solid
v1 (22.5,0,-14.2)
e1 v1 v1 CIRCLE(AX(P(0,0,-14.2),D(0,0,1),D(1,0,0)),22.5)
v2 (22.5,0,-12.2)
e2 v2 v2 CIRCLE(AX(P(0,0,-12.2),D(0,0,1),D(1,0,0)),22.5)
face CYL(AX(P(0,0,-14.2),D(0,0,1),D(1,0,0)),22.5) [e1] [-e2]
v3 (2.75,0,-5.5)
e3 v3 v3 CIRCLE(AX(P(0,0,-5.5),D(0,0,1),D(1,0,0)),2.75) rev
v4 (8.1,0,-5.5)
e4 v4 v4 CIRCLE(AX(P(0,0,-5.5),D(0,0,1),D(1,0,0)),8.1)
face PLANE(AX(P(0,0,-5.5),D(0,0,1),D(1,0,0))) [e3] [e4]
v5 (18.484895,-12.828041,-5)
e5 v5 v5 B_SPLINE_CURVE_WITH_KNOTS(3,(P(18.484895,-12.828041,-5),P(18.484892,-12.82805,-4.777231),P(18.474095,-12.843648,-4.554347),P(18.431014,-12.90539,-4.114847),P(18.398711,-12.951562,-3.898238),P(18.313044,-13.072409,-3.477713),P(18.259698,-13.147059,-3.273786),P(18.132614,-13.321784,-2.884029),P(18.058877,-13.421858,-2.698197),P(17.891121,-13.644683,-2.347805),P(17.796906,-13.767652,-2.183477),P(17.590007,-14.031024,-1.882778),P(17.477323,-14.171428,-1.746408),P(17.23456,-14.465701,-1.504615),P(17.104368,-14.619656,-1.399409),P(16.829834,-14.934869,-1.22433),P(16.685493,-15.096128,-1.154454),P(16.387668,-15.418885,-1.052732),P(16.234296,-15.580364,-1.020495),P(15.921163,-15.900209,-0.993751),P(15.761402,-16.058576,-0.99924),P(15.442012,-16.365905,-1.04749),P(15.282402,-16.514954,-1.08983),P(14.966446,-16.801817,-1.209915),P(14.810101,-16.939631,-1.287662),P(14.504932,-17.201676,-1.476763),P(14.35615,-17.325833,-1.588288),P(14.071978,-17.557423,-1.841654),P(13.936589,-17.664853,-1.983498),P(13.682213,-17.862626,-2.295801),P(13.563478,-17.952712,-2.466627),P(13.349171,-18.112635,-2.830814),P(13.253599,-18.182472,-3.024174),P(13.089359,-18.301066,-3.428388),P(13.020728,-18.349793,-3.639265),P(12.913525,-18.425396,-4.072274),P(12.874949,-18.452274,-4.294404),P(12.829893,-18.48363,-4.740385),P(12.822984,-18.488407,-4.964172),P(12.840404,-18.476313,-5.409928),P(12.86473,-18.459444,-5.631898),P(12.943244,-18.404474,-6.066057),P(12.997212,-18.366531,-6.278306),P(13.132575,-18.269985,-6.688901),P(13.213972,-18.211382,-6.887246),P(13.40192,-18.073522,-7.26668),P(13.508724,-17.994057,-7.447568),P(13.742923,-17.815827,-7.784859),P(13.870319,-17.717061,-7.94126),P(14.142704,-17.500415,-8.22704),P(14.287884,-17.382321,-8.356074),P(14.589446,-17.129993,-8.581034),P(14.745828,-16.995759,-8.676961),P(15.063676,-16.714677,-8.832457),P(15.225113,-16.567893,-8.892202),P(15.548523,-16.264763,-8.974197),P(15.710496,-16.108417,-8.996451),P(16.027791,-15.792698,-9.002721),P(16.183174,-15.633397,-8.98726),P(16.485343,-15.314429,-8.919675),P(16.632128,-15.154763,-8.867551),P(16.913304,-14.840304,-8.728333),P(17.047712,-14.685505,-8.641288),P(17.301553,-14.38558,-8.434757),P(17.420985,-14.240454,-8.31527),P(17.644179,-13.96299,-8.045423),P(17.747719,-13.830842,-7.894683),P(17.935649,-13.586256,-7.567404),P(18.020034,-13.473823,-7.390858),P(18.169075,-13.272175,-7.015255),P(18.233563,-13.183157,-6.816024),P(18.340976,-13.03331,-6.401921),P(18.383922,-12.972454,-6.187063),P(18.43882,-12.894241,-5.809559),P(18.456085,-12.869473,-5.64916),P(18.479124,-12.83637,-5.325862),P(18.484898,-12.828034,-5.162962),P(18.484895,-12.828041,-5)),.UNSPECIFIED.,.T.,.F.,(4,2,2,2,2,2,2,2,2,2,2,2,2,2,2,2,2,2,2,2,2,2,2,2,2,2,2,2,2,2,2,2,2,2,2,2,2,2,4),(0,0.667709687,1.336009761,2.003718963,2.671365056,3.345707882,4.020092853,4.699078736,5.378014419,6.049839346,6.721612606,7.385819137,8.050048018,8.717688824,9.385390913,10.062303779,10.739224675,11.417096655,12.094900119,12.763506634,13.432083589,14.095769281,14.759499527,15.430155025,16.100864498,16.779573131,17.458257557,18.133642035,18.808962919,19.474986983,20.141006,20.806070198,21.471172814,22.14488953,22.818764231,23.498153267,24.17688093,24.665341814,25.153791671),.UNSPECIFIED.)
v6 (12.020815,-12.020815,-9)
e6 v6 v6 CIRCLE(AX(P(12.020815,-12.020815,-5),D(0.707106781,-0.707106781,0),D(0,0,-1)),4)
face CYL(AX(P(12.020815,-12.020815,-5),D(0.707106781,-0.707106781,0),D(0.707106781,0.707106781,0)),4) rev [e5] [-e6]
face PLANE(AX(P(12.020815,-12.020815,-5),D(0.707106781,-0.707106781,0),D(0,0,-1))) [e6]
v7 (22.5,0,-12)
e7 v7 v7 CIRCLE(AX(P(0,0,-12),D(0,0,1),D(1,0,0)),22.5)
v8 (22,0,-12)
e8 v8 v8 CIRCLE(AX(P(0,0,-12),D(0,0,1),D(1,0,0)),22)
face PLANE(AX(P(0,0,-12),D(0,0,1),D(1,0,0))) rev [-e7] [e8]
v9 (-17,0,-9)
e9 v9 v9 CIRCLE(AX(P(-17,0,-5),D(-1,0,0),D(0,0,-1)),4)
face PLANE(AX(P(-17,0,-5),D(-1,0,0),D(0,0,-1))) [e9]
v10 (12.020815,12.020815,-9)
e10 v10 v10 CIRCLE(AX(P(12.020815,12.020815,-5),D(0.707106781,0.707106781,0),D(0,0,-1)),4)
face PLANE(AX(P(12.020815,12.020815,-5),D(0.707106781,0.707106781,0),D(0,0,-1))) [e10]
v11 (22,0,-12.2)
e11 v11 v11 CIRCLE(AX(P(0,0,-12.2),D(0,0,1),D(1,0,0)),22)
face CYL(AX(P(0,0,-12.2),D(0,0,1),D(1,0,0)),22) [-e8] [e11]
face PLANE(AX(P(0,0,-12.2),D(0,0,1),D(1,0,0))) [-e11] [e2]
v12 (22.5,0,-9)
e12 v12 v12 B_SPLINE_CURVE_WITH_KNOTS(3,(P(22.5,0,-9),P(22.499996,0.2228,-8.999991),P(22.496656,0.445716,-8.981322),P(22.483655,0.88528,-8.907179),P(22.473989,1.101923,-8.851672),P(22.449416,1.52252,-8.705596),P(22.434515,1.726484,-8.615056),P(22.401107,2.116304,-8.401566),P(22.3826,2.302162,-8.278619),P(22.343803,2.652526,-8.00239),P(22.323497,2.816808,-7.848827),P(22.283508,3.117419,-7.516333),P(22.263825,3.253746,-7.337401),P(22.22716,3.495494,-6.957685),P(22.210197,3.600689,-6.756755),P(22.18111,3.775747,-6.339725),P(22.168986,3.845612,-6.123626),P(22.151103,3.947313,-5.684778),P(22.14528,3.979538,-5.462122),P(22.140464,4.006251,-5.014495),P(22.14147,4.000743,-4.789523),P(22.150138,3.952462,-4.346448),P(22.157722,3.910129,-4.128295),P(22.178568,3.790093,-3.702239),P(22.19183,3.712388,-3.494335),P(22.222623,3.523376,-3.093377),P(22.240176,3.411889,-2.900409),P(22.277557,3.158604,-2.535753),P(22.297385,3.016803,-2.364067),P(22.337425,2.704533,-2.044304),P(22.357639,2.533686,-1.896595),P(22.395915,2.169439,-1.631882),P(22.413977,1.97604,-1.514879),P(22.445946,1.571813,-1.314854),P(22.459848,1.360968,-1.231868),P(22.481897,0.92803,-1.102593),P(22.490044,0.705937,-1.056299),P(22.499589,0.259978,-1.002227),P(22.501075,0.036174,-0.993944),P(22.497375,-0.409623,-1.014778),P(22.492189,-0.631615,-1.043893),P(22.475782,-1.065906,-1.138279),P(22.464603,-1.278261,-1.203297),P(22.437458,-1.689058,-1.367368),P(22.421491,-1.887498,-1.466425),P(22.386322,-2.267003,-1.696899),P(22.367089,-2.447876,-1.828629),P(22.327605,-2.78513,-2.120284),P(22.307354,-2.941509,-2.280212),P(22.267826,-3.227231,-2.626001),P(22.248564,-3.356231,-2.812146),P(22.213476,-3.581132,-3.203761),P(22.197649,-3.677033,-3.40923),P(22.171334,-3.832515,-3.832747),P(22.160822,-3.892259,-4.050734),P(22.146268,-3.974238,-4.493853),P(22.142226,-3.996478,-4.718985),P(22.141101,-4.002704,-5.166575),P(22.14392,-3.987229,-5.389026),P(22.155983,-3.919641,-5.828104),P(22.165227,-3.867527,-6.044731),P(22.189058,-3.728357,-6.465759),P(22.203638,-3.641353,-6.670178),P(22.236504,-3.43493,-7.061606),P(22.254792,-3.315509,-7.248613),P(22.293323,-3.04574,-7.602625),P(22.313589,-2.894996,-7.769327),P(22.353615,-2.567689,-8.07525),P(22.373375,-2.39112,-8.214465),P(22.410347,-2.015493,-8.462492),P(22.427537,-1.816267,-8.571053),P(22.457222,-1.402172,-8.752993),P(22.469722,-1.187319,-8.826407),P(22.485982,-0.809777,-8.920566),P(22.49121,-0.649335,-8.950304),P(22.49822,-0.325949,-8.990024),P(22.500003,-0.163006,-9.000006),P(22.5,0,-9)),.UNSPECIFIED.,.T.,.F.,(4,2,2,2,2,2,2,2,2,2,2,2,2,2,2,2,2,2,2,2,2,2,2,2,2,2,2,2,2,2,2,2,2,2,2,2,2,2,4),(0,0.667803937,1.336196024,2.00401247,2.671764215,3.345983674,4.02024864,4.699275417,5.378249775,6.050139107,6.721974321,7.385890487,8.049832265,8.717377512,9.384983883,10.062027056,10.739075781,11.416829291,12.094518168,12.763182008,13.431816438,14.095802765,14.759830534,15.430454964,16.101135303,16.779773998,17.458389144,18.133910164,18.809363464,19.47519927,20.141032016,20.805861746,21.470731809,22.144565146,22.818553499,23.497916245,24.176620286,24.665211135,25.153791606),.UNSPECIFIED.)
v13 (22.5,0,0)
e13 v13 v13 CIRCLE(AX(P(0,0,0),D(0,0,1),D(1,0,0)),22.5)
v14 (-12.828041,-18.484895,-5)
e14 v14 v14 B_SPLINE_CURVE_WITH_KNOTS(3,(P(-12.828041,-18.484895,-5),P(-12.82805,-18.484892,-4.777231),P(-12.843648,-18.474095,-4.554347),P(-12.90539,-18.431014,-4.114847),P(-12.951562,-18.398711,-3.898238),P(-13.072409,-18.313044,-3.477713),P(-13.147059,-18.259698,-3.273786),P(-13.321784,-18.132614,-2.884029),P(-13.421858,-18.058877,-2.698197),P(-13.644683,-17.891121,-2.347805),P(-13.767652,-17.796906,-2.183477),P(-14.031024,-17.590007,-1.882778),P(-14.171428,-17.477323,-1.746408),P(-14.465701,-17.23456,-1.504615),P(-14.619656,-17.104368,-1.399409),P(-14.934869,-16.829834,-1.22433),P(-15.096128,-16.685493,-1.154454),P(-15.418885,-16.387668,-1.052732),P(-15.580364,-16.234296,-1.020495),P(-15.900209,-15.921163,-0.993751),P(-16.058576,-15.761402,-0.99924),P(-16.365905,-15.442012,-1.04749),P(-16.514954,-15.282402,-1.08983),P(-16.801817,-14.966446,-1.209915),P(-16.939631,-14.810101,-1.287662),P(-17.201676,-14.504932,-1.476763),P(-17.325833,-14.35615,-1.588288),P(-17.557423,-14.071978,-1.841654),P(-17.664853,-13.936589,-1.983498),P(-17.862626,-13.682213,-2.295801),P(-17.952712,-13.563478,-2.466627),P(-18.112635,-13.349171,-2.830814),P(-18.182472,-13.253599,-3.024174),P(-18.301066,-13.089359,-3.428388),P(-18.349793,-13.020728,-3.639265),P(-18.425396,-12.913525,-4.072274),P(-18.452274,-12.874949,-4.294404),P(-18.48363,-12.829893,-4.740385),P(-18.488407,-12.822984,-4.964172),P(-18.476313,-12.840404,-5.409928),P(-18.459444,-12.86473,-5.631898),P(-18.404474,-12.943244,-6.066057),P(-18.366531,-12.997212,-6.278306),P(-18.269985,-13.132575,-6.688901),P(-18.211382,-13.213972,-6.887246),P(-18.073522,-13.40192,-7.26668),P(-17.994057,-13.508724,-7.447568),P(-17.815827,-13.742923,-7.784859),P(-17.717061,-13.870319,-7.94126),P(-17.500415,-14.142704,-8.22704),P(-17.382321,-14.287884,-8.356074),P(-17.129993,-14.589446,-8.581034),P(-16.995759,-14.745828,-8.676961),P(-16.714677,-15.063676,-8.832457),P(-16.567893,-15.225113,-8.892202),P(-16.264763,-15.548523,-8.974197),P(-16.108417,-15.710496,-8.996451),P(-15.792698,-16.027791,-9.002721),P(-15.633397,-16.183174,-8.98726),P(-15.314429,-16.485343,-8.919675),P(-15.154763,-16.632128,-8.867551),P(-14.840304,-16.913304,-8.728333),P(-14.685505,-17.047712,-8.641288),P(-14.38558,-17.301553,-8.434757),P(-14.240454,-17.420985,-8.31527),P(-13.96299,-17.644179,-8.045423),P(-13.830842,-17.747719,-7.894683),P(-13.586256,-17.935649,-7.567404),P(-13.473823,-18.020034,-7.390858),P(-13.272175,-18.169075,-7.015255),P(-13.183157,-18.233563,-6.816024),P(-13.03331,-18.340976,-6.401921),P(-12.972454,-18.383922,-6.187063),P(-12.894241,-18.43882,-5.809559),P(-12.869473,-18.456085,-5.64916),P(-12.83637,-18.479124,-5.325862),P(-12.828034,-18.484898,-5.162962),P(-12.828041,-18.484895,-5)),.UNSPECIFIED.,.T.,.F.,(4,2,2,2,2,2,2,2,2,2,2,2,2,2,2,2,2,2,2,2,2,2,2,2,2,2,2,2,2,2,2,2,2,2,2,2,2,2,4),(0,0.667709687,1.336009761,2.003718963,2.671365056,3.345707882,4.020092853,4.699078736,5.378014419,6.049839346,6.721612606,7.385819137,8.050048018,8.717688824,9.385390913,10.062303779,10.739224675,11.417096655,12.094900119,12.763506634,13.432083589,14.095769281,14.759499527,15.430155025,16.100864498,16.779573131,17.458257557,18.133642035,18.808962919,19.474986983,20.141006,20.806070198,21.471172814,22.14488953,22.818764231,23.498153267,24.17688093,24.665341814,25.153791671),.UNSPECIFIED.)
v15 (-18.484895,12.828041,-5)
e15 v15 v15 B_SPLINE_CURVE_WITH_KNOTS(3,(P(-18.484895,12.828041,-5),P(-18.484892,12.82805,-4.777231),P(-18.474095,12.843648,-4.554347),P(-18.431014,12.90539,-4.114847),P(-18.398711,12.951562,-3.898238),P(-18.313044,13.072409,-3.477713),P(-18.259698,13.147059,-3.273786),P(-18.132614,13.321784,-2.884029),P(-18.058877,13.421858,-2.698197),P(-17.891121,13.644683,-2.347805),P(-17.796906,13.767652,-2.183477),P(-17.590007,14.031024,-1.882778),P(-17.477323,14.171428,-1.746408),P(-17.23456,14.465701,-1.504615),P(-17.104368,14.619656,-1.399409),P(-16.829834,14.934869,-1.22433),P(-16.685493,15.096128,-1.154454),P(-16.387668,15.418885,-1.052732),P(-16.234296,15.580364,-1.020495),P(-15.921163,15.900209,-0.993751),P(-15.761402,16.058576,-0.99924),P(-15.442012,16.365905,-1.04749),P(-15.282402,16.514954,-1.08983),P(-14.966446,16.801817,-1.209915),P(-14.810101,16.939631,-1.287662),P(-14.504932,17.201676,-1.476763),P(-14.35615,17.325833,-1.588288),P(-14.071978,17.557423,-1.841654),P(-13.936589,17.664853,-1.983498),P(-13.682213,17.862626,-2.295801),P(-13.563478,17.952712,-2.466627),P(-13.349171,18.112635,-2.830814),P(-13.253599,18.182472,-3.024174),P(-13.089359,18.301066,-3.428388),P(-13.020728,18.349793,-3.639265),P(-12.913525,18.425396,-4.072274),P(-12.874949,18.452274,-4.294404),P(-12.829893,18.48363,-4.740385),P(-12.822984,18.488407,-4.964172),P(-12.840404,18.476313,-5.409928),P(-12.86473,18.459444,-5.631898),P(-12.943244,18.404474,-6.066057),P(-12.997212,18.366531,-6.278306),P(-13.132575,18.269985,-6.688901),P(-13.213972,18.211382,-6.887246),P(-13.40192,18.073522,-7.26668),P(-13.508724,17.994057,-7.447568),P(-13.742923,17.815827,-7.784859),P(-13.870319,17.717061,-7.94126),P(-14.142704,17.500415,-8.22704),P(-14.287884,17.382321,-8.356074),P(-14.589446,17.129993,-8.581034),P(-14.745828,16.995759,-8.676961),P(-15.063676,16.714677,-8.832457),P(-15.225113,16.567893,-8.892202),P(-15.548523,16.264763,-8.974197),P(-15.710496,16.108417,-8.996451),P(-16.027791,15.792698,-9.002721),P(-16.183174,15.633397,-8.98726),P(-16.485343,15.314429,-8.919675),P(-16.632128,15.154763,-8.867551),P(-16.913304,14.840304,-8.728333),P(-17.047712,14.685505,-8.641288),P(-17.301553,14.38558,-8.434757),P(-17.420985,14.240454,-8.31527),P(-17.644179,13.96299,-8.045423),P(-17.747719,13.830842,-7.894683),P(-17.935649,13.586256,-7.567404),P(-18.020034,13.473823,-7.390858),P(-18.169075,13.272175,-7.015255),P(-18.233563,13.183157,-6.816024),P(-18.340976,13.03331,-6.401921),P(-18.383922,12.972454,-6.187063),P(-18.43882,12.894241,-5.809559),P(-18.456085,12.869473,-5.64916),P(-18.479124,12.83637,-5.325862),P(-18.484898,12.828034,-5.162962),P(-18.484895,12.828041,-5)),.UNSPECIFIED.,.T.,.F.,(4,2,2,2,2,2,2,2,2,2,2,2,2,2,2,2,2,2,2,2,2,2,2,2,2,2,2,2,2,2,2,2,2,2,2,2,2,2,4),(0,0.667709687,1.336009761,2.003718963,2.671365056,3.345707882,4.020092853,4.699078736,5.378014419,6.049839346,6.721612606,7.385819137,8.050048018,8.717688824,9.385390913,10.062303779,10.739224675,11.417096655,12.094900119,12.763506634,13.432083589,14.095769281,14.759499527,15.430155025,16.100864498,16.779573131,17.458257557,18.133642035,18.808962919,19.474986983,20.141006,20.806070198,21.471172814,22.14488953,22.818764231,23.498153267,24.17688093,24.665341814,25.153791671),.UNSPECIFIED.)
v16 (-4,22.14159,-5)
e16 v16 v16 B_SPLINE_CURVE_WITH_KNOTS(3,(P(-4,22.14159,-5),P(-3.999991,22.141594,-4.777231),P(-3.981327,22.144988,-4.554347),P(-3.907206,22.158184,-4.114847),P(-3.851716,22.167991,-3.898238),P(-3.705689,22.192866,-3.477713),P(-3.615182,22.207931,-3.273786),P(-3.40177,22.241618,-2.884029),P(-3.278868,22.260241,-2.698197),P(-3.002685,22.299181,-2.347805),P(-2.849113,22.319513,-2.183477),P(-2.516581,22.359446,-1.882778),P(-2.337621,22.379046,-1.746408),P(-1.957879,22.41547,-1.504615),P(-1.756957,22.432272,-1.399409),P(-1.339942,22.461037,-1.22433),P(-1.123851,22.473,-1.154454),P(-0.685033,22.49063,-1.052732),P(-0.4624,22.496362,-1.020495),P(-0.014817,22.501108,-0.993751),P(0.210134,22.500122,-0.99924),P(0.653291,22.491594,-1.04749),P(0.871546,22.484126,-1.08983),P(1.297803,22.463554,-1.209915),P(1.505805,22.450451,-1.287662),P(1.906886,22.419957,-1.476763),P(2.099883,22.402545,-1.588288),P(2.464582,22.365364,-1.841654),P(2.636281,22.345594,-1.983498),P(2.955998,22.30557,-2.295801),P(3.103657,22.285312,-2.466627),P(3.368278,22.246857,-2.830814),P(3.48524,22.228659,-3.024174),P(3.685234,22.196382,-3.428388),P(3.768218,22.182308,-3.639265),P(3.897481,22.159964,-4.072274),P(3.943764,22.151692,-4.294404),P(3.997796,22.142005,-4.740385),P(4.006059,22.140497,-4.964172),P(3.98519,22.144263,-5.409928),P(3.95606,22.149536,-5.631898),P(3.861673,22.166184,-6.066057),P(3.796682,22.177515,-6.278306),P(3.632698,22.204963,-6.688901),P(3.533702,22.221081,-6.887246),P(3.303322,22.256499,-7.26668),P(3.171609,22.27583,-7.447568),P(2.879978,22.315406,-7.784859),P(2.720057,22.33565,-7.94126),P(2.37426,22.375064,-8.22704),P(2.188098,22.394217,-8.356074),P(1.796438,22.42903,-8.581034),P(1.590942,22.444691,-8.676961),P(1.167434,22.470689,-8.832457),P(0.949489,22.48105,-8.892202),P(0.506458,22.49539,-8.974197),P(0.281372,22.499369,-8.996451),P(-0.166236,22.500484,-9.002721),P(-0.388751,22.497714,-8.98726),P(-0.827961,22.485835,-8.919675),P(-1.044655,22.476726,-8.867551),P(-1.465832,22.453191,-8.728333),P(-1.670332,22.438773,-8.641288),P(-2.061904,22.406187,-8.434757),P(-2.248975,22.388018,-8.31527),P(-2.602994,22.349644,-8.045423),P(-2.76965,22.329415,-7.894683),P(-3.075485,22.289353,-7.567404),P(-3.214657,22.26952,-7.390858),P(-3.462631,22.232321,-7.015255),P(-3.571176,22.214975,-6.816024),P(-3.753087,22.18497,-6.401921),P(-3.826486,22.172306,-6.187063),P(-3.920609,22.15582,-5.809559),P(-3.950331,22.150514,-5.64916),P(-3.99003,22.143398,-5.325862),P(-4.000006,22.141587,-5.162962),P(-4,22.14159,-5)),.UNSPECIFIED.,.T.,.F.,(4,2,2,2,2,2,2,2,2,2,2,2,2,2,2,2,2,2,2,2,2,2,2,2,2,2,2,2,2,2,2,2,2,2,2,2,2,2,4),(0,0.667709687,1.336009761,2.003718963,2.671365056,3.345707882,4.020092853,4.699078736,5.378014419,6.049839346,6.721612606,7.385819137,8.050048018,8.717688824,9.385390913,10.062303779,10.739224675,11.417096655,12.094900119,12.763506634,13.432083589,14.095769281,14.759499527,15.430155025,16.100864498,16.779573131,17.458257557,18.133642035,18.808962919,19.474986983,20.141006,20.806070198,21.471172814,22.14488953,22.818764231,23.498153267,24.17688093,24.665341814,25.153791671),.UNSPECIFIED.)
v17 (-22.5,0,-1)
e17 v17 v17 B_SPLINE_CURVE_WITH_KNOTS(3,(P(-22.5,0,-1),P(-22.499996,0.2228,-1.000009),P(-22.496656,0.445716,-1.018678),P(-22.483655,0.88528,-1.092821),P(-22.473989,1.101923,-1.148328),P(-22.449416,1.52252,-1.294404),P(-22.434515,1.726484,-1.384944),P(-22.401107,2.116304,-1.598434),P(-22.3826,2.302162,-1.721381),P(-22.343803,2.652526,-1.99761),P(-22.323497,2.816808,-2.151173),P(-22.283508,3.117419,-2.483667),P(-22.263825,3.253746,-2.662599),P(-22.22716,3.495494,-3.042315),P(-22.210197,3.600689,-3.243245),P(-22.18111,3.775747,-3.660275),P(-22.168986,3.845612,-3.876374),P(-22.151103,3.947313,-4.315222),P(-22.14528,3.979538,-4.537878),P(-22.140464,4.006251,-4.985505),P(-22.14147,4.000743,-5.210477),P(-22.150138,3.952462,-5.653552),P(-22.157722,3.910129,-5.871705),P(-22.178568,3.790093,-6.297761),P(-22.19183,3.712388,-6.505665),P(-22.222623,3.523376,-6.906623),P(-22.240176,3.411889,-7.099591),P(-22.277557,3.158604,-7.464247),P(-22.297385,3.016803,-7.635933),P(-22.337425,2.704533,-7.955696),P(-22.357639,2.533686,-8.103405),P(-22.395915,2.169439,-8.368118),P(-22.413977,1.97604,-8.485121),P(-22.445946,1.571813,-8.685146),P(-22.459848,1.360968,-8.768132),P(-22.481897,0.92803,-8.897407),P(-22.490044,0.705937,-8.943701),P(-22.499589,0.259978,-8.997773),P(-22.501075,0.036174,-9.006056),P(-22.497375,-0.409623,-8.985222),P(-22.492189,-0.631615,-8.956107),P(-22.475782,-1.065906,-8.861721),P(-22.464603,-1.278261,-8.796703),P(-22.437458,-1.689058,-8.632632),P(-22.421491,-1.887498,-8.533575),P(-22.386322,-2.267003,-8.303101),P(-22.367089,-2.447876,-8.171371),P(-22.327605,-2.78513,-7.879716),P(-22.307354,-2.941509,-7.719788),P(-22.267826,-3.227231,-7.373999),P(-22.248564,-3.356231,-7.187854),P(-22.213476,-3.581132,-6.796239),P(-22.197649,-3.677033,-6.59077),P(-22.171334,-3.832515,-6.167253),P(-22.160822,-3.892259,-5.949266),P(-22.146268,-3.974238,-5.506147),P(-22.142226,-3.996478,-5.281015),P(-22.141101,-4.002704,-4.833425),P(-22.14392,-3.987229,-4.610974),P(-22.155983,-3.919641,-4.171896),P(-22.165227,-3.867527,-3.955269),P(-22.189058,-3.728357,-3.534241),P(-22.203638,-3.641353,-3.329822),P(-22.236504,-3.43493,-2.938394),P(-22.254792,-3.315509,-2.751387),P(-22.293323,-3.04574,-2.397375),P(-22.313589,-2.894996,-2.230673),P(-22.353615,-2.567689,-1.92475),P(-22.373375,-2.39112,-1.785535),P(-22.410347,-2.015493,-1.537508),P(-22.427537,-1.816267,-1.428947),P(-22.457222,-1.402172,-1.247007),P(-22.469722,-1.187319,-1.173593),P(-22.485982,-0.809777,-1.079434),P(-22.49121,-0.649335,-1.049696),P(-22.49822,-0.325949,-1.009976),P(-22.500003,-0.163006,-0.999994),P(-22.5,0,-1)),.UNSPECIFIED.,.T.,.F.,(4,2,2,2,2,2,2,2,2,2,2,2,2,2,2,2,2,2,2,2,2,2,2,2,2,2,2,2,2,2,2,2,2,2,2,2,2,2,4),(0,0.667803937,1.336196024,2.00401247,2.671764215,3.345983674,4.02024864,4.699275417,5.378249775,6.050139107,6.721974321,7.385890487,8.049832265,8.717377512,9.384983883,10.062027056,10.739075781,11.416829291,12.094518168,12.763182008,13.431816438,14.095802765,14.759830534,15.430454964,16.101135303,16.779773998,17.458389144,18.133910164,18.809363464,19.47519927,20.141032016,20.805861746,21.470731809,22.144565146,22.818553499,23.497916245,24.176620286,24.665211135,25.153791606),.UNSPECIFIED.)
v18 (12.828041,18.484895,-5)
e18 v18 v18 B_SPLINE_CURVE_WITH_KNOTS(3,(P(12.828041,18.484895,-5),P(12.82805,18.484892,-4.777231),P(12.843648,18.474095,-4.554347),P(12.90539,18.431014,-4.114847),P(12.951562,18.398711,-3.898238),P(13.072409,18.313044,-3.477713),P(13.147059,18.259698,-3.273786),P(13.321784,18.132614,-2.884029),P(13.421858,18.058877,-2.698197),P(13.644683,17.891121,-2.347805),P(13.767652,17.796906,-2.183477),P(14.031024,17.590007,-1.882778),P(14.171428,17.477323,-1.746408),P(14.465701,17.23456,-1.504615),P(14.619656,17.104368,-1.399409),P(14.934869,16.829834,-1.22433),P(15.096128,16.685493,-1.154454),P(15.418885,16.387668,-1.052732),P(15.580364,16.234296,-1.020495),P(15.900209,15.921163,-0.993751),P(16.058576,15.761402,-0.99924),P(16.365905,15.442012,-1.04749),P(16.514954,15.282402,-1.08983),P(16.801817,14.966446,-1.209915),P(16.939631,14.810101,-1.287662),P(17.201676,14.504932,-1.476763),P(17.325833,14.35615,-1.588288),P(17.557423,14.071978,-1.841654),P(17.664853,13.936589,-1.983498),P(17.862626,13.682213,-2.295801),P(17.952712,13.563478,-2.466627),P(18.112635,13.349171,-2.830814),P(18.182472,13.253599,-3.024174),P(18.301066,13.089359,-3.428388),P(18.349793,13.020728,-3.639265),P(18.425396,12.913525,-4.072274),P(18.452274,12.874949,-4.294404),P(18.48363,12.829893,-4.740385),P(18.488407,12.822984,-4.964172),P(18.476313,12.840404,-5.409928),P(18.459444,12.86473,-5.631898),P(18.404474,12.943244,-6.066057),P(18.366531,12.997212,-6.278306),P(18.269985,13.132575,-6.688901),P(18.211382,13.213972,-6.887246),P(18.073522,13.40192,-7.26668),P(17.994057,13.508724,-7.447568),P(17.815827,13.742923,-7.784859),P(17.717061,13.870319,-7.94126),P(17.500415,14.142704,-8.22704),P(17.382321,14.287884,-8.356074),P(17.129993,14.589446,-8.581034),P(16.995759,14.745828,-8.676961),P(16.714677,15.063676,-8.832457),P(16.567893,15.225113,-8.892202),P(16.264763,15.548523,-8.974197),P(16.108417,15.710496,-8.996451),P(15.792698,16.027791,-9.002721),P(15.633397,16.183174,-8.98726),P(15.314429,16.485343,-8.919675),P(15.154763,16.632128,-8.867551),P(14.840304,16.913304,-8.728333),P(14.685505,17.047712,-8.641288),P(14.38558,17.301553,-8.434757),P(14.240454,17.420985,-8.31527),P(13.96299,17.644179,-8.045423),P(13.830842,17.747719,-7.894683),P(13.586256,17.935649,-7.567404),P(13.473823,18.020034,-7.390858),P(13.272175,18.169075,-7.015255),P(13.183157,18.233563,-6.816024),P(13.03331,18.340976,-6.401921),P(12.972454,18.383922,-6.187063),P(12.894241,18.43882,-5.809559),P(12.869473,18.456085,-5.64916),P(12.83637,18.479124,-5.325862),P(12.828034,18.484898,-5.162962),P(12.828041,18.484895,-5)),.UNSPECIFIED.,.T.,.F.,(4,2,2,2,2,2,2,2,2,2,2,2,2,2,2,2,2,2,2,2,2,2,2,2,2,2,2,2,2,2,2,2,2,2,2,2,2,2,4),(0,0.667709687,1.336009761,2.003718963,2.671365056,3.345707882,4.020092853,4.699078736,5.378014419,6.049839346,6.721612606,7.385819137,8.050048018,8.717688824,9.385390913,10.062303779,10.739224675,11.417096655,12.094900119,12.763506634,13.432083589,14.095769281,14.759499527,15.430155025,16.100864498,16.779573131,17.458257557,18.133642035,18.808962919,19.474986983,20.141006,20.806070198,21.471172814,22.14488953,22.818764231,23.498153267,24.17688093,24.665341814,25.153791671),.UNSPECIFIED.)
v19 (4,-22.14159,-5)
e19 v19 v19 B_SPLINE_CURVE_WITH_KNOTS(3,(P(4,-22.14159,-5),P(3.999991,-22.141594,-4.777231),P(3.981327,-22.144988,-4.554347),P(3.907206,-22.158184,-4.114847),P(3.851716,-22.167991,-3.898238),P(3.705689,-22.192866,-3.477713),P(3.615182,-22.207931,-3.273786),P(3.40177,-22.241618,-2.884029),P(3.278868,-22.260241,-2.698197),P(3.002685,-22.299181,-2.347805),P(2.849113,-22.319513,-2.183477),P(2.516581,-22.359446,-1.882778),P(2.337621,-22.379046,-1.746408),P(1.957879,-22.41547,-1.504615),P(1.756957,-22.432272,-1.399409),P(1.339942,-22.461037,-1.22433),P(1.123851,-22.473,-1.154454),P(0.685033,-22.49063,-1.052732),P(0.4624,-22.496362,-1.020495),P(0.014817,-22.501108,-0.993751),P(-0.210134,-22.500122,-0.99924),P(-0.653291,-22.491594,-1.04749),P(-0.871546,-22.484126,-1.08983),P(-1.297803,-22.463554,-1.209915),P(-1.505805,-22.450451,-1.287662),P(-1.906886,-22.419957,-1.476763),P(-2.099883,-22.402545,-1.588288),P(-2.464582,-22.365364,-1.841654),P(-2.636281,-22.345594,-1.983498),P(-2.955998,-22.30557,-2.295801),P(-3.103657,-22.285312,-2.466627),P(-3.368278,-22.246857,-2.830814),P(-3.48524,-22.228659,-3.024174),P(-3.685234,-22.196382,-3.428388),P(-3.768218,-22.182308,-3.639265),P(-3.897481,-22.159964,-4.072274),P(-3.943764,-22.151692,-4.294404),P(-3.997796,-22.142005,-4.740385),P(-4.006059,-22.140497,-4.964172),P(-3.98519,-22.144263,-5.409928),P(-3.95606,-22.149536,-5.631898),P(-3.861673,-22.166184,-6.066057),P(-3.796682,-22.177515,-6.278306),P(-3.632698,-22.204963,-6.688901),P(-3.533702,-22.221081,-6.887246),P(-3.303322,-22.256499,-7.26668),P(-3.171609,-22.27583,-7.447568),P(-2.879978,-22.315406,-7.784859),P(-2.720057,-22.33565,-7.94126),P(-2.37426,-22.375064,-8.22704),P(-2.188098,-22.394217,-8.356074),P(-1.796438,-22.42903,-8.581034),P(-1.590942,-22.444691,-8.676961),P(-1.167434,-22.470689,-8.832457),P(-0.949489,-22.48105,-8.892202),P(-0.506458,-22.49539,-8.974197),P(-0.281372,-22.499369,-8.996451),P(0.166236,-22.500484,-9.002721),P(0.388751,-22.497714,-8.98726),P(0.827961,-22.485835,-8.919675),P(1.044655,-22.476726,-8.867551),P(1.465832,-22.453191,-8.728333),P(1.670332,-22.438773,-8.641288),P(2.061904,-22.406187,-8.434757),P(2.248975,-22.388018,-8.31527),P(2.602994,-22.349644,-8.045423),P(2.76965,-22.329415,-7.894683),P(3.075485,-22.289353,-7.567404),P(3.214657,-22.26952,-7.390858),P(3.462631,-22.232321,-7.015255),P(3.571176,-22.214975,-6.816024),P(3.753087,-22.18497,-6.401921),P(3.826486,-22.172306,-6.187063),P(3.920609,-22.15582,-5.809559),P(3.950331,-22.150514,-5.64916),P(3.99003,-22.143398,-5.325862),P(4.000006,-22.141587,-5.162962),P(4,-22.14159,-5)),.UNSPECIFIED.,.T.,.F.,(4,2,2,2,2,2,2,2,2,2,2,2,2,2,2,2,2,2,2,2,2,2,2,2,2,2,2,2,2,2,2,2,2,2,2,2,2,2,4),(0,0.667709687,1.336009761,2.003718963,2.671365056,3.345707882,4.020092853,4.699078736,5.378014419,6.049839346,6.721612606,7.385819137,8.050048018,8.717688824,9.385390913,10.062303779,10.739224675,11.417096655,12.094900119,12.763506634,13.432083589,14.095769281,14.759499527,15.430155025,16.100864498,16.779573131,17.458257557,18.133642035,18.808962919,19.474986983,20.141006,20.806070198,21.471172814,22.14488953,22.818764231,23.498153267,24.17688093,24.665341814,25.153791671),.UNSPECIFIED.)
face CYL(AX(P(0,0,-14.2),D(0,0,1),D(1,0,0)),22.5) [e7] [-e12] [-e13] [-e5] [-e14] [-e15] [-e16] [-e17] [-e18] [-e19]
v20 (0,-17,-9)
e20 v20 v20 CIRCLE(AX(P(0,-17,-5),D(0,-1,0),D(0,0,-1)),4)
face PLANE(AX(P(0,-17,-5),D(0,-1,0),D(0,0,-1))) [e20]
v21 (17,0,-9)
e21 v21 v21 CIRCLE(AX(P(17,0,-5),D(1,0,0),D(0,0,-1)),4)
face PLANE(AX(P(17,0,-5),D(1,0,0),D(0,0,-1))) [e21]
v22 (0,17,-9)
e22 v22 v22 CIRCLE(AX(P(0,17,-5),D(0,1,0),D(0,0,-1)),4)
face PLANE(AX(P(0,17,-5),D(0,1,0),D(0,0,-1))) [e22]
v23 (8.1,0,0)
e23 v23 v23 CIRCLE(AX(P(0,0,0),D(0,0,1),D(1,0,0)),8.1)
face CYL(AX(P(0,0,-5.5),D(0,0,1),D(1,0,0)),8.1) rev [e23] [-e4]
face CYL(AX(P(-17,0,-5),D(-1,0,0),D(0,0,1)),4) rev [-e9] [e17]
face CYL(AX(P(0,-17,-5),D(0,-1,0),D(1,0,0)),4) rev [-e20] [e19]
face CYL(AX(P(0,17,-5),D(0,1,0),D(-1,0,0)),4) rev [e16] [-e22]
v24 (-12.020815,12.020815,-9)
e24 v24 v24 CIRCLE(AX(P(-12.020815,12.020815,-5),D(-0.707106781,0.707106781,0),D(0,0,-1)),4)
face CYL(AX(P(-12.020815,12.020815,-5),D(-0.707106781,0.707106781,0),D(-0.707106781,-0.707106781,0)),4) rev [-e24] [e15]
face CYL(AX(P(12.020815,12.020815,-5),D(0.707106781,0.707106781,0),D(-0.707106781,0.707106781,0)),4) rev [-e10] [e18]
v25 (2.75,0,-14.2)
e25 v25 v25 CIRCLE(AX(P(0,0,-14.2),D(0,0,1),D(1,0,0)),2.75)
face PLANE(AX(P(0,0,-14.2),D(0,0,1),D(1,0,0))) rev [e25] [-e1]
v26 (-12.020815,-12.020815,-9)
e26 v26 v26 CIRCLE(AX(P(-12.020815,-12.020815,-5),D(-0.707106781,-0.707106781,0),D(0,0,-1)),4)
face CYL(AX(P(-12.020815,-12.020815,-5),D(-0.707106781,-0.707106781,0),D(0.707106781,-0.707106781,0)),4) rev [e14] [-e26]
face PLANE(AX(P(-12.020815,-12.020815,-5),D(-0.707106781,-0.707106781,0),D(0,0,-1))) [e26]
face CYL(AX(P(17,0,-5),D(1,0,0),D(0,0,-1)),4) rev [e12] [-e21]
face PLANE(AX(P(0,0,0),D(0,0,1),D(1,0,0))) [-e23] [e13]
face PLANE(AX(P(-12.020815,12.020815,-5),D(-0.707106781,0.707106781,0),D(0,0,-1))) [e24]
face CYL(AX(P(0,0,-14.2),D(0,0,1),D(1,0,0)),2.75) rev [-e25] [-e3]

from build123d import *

# Parameters (mm, degrees)
SKETCH3_R                 = 22.5
BOSS_EXTRUDE3_DEPTH       = 14.2
SKETCH8_R                 = 4
CUT_EXTRUDE4_DEPTH        = 5.5
SKETCH6_R                 = 2.75
CUT_EXTRUDE6_DEPTH        = 14.2
CIRPATTERN1_COUNT         = 8
SKETCH5_R                 = 8.1
CUT_EXTRUDE7_DEPTH        = 5.5
BOUNDARY_CUT1_START       = -12.2
BOUNDARY_CUT1_OUTLINE_R   = 22.5
BOUNDARY_CUT1_OUTLINE_R_2 = 22
BOUNDARY_CUT1_DEPTH       = 0.2


# Read off the part's stored shape, not the designer's step: Boundary-Cut1
with BuildPart() as part:
    # Sketch3 → Boss-Extrude3 (new body)
    with BuildSketch(Plane.XY):
        Circle(SKETCH3_R)
    extrude(amount=-BOSS_EXTRUDE3_DEPTH)

    # Sketch8 → Cut-Extrude4 (cut)
    with BuildSketch(Plane(origin=(22.5, 0, 0), x_dir=(0, 0, -1), z_dir=(1, 0, 0))):
        with Locations((5, 0)):
            Circle(SKETCH8_R)
    cut_extrude4 = extrude(amount=-CUT_EXTRUDE4_DEPTH, mode=Mode.SUBTRACT)

    # Sketch6 → Cut-Extrude6 (cut)
    with BuildSketch(Plane.XY):
        Circle(SKETCH6_R)
    extrude(amount=-CUT_EXTRUDE6_DEPTH, mode=Mode.SUBTRACT)

    # CirPattern1: Cut-Extrude4 ×8 about axis
    cirpattern1_axis = Axis((0, 0, 0), (0, 0, 1))
    for i in range(1, CIRPATTERN1_COUNT):
        add(cut_extrude4.rotate(cirpattern1_axis, i * 360 / CIRPATTERN1_COUNT), mode=Mode.SUBTRACT)

    # Sketch5 → Cut-Extrude7 (cut)
    with BuildSketch(Plane.XY):
        Circle(SKETCH5_R)
    extrude(amount=-CUT_EXTRUDE7_DEPTH, mode=Mode.SUBTRACT)

    # Boundary-Cut1 outline → Boundary-Cut1 (cut)
    with BuildSketch(Plane.XY.offset(BOUNDARY_CUT1_START)):
        Circle(BOUNDARY_CUT1_OUTLINE_R)
        Circle(BOUNDARY_CUT1_OUTLINE_R_2, mode=Mode.SUBTRACT)
    extrude(amount=BOUNDARY_CUT1_DEPTH, mode=Mode.SUBTRACT)


solid = part.part
